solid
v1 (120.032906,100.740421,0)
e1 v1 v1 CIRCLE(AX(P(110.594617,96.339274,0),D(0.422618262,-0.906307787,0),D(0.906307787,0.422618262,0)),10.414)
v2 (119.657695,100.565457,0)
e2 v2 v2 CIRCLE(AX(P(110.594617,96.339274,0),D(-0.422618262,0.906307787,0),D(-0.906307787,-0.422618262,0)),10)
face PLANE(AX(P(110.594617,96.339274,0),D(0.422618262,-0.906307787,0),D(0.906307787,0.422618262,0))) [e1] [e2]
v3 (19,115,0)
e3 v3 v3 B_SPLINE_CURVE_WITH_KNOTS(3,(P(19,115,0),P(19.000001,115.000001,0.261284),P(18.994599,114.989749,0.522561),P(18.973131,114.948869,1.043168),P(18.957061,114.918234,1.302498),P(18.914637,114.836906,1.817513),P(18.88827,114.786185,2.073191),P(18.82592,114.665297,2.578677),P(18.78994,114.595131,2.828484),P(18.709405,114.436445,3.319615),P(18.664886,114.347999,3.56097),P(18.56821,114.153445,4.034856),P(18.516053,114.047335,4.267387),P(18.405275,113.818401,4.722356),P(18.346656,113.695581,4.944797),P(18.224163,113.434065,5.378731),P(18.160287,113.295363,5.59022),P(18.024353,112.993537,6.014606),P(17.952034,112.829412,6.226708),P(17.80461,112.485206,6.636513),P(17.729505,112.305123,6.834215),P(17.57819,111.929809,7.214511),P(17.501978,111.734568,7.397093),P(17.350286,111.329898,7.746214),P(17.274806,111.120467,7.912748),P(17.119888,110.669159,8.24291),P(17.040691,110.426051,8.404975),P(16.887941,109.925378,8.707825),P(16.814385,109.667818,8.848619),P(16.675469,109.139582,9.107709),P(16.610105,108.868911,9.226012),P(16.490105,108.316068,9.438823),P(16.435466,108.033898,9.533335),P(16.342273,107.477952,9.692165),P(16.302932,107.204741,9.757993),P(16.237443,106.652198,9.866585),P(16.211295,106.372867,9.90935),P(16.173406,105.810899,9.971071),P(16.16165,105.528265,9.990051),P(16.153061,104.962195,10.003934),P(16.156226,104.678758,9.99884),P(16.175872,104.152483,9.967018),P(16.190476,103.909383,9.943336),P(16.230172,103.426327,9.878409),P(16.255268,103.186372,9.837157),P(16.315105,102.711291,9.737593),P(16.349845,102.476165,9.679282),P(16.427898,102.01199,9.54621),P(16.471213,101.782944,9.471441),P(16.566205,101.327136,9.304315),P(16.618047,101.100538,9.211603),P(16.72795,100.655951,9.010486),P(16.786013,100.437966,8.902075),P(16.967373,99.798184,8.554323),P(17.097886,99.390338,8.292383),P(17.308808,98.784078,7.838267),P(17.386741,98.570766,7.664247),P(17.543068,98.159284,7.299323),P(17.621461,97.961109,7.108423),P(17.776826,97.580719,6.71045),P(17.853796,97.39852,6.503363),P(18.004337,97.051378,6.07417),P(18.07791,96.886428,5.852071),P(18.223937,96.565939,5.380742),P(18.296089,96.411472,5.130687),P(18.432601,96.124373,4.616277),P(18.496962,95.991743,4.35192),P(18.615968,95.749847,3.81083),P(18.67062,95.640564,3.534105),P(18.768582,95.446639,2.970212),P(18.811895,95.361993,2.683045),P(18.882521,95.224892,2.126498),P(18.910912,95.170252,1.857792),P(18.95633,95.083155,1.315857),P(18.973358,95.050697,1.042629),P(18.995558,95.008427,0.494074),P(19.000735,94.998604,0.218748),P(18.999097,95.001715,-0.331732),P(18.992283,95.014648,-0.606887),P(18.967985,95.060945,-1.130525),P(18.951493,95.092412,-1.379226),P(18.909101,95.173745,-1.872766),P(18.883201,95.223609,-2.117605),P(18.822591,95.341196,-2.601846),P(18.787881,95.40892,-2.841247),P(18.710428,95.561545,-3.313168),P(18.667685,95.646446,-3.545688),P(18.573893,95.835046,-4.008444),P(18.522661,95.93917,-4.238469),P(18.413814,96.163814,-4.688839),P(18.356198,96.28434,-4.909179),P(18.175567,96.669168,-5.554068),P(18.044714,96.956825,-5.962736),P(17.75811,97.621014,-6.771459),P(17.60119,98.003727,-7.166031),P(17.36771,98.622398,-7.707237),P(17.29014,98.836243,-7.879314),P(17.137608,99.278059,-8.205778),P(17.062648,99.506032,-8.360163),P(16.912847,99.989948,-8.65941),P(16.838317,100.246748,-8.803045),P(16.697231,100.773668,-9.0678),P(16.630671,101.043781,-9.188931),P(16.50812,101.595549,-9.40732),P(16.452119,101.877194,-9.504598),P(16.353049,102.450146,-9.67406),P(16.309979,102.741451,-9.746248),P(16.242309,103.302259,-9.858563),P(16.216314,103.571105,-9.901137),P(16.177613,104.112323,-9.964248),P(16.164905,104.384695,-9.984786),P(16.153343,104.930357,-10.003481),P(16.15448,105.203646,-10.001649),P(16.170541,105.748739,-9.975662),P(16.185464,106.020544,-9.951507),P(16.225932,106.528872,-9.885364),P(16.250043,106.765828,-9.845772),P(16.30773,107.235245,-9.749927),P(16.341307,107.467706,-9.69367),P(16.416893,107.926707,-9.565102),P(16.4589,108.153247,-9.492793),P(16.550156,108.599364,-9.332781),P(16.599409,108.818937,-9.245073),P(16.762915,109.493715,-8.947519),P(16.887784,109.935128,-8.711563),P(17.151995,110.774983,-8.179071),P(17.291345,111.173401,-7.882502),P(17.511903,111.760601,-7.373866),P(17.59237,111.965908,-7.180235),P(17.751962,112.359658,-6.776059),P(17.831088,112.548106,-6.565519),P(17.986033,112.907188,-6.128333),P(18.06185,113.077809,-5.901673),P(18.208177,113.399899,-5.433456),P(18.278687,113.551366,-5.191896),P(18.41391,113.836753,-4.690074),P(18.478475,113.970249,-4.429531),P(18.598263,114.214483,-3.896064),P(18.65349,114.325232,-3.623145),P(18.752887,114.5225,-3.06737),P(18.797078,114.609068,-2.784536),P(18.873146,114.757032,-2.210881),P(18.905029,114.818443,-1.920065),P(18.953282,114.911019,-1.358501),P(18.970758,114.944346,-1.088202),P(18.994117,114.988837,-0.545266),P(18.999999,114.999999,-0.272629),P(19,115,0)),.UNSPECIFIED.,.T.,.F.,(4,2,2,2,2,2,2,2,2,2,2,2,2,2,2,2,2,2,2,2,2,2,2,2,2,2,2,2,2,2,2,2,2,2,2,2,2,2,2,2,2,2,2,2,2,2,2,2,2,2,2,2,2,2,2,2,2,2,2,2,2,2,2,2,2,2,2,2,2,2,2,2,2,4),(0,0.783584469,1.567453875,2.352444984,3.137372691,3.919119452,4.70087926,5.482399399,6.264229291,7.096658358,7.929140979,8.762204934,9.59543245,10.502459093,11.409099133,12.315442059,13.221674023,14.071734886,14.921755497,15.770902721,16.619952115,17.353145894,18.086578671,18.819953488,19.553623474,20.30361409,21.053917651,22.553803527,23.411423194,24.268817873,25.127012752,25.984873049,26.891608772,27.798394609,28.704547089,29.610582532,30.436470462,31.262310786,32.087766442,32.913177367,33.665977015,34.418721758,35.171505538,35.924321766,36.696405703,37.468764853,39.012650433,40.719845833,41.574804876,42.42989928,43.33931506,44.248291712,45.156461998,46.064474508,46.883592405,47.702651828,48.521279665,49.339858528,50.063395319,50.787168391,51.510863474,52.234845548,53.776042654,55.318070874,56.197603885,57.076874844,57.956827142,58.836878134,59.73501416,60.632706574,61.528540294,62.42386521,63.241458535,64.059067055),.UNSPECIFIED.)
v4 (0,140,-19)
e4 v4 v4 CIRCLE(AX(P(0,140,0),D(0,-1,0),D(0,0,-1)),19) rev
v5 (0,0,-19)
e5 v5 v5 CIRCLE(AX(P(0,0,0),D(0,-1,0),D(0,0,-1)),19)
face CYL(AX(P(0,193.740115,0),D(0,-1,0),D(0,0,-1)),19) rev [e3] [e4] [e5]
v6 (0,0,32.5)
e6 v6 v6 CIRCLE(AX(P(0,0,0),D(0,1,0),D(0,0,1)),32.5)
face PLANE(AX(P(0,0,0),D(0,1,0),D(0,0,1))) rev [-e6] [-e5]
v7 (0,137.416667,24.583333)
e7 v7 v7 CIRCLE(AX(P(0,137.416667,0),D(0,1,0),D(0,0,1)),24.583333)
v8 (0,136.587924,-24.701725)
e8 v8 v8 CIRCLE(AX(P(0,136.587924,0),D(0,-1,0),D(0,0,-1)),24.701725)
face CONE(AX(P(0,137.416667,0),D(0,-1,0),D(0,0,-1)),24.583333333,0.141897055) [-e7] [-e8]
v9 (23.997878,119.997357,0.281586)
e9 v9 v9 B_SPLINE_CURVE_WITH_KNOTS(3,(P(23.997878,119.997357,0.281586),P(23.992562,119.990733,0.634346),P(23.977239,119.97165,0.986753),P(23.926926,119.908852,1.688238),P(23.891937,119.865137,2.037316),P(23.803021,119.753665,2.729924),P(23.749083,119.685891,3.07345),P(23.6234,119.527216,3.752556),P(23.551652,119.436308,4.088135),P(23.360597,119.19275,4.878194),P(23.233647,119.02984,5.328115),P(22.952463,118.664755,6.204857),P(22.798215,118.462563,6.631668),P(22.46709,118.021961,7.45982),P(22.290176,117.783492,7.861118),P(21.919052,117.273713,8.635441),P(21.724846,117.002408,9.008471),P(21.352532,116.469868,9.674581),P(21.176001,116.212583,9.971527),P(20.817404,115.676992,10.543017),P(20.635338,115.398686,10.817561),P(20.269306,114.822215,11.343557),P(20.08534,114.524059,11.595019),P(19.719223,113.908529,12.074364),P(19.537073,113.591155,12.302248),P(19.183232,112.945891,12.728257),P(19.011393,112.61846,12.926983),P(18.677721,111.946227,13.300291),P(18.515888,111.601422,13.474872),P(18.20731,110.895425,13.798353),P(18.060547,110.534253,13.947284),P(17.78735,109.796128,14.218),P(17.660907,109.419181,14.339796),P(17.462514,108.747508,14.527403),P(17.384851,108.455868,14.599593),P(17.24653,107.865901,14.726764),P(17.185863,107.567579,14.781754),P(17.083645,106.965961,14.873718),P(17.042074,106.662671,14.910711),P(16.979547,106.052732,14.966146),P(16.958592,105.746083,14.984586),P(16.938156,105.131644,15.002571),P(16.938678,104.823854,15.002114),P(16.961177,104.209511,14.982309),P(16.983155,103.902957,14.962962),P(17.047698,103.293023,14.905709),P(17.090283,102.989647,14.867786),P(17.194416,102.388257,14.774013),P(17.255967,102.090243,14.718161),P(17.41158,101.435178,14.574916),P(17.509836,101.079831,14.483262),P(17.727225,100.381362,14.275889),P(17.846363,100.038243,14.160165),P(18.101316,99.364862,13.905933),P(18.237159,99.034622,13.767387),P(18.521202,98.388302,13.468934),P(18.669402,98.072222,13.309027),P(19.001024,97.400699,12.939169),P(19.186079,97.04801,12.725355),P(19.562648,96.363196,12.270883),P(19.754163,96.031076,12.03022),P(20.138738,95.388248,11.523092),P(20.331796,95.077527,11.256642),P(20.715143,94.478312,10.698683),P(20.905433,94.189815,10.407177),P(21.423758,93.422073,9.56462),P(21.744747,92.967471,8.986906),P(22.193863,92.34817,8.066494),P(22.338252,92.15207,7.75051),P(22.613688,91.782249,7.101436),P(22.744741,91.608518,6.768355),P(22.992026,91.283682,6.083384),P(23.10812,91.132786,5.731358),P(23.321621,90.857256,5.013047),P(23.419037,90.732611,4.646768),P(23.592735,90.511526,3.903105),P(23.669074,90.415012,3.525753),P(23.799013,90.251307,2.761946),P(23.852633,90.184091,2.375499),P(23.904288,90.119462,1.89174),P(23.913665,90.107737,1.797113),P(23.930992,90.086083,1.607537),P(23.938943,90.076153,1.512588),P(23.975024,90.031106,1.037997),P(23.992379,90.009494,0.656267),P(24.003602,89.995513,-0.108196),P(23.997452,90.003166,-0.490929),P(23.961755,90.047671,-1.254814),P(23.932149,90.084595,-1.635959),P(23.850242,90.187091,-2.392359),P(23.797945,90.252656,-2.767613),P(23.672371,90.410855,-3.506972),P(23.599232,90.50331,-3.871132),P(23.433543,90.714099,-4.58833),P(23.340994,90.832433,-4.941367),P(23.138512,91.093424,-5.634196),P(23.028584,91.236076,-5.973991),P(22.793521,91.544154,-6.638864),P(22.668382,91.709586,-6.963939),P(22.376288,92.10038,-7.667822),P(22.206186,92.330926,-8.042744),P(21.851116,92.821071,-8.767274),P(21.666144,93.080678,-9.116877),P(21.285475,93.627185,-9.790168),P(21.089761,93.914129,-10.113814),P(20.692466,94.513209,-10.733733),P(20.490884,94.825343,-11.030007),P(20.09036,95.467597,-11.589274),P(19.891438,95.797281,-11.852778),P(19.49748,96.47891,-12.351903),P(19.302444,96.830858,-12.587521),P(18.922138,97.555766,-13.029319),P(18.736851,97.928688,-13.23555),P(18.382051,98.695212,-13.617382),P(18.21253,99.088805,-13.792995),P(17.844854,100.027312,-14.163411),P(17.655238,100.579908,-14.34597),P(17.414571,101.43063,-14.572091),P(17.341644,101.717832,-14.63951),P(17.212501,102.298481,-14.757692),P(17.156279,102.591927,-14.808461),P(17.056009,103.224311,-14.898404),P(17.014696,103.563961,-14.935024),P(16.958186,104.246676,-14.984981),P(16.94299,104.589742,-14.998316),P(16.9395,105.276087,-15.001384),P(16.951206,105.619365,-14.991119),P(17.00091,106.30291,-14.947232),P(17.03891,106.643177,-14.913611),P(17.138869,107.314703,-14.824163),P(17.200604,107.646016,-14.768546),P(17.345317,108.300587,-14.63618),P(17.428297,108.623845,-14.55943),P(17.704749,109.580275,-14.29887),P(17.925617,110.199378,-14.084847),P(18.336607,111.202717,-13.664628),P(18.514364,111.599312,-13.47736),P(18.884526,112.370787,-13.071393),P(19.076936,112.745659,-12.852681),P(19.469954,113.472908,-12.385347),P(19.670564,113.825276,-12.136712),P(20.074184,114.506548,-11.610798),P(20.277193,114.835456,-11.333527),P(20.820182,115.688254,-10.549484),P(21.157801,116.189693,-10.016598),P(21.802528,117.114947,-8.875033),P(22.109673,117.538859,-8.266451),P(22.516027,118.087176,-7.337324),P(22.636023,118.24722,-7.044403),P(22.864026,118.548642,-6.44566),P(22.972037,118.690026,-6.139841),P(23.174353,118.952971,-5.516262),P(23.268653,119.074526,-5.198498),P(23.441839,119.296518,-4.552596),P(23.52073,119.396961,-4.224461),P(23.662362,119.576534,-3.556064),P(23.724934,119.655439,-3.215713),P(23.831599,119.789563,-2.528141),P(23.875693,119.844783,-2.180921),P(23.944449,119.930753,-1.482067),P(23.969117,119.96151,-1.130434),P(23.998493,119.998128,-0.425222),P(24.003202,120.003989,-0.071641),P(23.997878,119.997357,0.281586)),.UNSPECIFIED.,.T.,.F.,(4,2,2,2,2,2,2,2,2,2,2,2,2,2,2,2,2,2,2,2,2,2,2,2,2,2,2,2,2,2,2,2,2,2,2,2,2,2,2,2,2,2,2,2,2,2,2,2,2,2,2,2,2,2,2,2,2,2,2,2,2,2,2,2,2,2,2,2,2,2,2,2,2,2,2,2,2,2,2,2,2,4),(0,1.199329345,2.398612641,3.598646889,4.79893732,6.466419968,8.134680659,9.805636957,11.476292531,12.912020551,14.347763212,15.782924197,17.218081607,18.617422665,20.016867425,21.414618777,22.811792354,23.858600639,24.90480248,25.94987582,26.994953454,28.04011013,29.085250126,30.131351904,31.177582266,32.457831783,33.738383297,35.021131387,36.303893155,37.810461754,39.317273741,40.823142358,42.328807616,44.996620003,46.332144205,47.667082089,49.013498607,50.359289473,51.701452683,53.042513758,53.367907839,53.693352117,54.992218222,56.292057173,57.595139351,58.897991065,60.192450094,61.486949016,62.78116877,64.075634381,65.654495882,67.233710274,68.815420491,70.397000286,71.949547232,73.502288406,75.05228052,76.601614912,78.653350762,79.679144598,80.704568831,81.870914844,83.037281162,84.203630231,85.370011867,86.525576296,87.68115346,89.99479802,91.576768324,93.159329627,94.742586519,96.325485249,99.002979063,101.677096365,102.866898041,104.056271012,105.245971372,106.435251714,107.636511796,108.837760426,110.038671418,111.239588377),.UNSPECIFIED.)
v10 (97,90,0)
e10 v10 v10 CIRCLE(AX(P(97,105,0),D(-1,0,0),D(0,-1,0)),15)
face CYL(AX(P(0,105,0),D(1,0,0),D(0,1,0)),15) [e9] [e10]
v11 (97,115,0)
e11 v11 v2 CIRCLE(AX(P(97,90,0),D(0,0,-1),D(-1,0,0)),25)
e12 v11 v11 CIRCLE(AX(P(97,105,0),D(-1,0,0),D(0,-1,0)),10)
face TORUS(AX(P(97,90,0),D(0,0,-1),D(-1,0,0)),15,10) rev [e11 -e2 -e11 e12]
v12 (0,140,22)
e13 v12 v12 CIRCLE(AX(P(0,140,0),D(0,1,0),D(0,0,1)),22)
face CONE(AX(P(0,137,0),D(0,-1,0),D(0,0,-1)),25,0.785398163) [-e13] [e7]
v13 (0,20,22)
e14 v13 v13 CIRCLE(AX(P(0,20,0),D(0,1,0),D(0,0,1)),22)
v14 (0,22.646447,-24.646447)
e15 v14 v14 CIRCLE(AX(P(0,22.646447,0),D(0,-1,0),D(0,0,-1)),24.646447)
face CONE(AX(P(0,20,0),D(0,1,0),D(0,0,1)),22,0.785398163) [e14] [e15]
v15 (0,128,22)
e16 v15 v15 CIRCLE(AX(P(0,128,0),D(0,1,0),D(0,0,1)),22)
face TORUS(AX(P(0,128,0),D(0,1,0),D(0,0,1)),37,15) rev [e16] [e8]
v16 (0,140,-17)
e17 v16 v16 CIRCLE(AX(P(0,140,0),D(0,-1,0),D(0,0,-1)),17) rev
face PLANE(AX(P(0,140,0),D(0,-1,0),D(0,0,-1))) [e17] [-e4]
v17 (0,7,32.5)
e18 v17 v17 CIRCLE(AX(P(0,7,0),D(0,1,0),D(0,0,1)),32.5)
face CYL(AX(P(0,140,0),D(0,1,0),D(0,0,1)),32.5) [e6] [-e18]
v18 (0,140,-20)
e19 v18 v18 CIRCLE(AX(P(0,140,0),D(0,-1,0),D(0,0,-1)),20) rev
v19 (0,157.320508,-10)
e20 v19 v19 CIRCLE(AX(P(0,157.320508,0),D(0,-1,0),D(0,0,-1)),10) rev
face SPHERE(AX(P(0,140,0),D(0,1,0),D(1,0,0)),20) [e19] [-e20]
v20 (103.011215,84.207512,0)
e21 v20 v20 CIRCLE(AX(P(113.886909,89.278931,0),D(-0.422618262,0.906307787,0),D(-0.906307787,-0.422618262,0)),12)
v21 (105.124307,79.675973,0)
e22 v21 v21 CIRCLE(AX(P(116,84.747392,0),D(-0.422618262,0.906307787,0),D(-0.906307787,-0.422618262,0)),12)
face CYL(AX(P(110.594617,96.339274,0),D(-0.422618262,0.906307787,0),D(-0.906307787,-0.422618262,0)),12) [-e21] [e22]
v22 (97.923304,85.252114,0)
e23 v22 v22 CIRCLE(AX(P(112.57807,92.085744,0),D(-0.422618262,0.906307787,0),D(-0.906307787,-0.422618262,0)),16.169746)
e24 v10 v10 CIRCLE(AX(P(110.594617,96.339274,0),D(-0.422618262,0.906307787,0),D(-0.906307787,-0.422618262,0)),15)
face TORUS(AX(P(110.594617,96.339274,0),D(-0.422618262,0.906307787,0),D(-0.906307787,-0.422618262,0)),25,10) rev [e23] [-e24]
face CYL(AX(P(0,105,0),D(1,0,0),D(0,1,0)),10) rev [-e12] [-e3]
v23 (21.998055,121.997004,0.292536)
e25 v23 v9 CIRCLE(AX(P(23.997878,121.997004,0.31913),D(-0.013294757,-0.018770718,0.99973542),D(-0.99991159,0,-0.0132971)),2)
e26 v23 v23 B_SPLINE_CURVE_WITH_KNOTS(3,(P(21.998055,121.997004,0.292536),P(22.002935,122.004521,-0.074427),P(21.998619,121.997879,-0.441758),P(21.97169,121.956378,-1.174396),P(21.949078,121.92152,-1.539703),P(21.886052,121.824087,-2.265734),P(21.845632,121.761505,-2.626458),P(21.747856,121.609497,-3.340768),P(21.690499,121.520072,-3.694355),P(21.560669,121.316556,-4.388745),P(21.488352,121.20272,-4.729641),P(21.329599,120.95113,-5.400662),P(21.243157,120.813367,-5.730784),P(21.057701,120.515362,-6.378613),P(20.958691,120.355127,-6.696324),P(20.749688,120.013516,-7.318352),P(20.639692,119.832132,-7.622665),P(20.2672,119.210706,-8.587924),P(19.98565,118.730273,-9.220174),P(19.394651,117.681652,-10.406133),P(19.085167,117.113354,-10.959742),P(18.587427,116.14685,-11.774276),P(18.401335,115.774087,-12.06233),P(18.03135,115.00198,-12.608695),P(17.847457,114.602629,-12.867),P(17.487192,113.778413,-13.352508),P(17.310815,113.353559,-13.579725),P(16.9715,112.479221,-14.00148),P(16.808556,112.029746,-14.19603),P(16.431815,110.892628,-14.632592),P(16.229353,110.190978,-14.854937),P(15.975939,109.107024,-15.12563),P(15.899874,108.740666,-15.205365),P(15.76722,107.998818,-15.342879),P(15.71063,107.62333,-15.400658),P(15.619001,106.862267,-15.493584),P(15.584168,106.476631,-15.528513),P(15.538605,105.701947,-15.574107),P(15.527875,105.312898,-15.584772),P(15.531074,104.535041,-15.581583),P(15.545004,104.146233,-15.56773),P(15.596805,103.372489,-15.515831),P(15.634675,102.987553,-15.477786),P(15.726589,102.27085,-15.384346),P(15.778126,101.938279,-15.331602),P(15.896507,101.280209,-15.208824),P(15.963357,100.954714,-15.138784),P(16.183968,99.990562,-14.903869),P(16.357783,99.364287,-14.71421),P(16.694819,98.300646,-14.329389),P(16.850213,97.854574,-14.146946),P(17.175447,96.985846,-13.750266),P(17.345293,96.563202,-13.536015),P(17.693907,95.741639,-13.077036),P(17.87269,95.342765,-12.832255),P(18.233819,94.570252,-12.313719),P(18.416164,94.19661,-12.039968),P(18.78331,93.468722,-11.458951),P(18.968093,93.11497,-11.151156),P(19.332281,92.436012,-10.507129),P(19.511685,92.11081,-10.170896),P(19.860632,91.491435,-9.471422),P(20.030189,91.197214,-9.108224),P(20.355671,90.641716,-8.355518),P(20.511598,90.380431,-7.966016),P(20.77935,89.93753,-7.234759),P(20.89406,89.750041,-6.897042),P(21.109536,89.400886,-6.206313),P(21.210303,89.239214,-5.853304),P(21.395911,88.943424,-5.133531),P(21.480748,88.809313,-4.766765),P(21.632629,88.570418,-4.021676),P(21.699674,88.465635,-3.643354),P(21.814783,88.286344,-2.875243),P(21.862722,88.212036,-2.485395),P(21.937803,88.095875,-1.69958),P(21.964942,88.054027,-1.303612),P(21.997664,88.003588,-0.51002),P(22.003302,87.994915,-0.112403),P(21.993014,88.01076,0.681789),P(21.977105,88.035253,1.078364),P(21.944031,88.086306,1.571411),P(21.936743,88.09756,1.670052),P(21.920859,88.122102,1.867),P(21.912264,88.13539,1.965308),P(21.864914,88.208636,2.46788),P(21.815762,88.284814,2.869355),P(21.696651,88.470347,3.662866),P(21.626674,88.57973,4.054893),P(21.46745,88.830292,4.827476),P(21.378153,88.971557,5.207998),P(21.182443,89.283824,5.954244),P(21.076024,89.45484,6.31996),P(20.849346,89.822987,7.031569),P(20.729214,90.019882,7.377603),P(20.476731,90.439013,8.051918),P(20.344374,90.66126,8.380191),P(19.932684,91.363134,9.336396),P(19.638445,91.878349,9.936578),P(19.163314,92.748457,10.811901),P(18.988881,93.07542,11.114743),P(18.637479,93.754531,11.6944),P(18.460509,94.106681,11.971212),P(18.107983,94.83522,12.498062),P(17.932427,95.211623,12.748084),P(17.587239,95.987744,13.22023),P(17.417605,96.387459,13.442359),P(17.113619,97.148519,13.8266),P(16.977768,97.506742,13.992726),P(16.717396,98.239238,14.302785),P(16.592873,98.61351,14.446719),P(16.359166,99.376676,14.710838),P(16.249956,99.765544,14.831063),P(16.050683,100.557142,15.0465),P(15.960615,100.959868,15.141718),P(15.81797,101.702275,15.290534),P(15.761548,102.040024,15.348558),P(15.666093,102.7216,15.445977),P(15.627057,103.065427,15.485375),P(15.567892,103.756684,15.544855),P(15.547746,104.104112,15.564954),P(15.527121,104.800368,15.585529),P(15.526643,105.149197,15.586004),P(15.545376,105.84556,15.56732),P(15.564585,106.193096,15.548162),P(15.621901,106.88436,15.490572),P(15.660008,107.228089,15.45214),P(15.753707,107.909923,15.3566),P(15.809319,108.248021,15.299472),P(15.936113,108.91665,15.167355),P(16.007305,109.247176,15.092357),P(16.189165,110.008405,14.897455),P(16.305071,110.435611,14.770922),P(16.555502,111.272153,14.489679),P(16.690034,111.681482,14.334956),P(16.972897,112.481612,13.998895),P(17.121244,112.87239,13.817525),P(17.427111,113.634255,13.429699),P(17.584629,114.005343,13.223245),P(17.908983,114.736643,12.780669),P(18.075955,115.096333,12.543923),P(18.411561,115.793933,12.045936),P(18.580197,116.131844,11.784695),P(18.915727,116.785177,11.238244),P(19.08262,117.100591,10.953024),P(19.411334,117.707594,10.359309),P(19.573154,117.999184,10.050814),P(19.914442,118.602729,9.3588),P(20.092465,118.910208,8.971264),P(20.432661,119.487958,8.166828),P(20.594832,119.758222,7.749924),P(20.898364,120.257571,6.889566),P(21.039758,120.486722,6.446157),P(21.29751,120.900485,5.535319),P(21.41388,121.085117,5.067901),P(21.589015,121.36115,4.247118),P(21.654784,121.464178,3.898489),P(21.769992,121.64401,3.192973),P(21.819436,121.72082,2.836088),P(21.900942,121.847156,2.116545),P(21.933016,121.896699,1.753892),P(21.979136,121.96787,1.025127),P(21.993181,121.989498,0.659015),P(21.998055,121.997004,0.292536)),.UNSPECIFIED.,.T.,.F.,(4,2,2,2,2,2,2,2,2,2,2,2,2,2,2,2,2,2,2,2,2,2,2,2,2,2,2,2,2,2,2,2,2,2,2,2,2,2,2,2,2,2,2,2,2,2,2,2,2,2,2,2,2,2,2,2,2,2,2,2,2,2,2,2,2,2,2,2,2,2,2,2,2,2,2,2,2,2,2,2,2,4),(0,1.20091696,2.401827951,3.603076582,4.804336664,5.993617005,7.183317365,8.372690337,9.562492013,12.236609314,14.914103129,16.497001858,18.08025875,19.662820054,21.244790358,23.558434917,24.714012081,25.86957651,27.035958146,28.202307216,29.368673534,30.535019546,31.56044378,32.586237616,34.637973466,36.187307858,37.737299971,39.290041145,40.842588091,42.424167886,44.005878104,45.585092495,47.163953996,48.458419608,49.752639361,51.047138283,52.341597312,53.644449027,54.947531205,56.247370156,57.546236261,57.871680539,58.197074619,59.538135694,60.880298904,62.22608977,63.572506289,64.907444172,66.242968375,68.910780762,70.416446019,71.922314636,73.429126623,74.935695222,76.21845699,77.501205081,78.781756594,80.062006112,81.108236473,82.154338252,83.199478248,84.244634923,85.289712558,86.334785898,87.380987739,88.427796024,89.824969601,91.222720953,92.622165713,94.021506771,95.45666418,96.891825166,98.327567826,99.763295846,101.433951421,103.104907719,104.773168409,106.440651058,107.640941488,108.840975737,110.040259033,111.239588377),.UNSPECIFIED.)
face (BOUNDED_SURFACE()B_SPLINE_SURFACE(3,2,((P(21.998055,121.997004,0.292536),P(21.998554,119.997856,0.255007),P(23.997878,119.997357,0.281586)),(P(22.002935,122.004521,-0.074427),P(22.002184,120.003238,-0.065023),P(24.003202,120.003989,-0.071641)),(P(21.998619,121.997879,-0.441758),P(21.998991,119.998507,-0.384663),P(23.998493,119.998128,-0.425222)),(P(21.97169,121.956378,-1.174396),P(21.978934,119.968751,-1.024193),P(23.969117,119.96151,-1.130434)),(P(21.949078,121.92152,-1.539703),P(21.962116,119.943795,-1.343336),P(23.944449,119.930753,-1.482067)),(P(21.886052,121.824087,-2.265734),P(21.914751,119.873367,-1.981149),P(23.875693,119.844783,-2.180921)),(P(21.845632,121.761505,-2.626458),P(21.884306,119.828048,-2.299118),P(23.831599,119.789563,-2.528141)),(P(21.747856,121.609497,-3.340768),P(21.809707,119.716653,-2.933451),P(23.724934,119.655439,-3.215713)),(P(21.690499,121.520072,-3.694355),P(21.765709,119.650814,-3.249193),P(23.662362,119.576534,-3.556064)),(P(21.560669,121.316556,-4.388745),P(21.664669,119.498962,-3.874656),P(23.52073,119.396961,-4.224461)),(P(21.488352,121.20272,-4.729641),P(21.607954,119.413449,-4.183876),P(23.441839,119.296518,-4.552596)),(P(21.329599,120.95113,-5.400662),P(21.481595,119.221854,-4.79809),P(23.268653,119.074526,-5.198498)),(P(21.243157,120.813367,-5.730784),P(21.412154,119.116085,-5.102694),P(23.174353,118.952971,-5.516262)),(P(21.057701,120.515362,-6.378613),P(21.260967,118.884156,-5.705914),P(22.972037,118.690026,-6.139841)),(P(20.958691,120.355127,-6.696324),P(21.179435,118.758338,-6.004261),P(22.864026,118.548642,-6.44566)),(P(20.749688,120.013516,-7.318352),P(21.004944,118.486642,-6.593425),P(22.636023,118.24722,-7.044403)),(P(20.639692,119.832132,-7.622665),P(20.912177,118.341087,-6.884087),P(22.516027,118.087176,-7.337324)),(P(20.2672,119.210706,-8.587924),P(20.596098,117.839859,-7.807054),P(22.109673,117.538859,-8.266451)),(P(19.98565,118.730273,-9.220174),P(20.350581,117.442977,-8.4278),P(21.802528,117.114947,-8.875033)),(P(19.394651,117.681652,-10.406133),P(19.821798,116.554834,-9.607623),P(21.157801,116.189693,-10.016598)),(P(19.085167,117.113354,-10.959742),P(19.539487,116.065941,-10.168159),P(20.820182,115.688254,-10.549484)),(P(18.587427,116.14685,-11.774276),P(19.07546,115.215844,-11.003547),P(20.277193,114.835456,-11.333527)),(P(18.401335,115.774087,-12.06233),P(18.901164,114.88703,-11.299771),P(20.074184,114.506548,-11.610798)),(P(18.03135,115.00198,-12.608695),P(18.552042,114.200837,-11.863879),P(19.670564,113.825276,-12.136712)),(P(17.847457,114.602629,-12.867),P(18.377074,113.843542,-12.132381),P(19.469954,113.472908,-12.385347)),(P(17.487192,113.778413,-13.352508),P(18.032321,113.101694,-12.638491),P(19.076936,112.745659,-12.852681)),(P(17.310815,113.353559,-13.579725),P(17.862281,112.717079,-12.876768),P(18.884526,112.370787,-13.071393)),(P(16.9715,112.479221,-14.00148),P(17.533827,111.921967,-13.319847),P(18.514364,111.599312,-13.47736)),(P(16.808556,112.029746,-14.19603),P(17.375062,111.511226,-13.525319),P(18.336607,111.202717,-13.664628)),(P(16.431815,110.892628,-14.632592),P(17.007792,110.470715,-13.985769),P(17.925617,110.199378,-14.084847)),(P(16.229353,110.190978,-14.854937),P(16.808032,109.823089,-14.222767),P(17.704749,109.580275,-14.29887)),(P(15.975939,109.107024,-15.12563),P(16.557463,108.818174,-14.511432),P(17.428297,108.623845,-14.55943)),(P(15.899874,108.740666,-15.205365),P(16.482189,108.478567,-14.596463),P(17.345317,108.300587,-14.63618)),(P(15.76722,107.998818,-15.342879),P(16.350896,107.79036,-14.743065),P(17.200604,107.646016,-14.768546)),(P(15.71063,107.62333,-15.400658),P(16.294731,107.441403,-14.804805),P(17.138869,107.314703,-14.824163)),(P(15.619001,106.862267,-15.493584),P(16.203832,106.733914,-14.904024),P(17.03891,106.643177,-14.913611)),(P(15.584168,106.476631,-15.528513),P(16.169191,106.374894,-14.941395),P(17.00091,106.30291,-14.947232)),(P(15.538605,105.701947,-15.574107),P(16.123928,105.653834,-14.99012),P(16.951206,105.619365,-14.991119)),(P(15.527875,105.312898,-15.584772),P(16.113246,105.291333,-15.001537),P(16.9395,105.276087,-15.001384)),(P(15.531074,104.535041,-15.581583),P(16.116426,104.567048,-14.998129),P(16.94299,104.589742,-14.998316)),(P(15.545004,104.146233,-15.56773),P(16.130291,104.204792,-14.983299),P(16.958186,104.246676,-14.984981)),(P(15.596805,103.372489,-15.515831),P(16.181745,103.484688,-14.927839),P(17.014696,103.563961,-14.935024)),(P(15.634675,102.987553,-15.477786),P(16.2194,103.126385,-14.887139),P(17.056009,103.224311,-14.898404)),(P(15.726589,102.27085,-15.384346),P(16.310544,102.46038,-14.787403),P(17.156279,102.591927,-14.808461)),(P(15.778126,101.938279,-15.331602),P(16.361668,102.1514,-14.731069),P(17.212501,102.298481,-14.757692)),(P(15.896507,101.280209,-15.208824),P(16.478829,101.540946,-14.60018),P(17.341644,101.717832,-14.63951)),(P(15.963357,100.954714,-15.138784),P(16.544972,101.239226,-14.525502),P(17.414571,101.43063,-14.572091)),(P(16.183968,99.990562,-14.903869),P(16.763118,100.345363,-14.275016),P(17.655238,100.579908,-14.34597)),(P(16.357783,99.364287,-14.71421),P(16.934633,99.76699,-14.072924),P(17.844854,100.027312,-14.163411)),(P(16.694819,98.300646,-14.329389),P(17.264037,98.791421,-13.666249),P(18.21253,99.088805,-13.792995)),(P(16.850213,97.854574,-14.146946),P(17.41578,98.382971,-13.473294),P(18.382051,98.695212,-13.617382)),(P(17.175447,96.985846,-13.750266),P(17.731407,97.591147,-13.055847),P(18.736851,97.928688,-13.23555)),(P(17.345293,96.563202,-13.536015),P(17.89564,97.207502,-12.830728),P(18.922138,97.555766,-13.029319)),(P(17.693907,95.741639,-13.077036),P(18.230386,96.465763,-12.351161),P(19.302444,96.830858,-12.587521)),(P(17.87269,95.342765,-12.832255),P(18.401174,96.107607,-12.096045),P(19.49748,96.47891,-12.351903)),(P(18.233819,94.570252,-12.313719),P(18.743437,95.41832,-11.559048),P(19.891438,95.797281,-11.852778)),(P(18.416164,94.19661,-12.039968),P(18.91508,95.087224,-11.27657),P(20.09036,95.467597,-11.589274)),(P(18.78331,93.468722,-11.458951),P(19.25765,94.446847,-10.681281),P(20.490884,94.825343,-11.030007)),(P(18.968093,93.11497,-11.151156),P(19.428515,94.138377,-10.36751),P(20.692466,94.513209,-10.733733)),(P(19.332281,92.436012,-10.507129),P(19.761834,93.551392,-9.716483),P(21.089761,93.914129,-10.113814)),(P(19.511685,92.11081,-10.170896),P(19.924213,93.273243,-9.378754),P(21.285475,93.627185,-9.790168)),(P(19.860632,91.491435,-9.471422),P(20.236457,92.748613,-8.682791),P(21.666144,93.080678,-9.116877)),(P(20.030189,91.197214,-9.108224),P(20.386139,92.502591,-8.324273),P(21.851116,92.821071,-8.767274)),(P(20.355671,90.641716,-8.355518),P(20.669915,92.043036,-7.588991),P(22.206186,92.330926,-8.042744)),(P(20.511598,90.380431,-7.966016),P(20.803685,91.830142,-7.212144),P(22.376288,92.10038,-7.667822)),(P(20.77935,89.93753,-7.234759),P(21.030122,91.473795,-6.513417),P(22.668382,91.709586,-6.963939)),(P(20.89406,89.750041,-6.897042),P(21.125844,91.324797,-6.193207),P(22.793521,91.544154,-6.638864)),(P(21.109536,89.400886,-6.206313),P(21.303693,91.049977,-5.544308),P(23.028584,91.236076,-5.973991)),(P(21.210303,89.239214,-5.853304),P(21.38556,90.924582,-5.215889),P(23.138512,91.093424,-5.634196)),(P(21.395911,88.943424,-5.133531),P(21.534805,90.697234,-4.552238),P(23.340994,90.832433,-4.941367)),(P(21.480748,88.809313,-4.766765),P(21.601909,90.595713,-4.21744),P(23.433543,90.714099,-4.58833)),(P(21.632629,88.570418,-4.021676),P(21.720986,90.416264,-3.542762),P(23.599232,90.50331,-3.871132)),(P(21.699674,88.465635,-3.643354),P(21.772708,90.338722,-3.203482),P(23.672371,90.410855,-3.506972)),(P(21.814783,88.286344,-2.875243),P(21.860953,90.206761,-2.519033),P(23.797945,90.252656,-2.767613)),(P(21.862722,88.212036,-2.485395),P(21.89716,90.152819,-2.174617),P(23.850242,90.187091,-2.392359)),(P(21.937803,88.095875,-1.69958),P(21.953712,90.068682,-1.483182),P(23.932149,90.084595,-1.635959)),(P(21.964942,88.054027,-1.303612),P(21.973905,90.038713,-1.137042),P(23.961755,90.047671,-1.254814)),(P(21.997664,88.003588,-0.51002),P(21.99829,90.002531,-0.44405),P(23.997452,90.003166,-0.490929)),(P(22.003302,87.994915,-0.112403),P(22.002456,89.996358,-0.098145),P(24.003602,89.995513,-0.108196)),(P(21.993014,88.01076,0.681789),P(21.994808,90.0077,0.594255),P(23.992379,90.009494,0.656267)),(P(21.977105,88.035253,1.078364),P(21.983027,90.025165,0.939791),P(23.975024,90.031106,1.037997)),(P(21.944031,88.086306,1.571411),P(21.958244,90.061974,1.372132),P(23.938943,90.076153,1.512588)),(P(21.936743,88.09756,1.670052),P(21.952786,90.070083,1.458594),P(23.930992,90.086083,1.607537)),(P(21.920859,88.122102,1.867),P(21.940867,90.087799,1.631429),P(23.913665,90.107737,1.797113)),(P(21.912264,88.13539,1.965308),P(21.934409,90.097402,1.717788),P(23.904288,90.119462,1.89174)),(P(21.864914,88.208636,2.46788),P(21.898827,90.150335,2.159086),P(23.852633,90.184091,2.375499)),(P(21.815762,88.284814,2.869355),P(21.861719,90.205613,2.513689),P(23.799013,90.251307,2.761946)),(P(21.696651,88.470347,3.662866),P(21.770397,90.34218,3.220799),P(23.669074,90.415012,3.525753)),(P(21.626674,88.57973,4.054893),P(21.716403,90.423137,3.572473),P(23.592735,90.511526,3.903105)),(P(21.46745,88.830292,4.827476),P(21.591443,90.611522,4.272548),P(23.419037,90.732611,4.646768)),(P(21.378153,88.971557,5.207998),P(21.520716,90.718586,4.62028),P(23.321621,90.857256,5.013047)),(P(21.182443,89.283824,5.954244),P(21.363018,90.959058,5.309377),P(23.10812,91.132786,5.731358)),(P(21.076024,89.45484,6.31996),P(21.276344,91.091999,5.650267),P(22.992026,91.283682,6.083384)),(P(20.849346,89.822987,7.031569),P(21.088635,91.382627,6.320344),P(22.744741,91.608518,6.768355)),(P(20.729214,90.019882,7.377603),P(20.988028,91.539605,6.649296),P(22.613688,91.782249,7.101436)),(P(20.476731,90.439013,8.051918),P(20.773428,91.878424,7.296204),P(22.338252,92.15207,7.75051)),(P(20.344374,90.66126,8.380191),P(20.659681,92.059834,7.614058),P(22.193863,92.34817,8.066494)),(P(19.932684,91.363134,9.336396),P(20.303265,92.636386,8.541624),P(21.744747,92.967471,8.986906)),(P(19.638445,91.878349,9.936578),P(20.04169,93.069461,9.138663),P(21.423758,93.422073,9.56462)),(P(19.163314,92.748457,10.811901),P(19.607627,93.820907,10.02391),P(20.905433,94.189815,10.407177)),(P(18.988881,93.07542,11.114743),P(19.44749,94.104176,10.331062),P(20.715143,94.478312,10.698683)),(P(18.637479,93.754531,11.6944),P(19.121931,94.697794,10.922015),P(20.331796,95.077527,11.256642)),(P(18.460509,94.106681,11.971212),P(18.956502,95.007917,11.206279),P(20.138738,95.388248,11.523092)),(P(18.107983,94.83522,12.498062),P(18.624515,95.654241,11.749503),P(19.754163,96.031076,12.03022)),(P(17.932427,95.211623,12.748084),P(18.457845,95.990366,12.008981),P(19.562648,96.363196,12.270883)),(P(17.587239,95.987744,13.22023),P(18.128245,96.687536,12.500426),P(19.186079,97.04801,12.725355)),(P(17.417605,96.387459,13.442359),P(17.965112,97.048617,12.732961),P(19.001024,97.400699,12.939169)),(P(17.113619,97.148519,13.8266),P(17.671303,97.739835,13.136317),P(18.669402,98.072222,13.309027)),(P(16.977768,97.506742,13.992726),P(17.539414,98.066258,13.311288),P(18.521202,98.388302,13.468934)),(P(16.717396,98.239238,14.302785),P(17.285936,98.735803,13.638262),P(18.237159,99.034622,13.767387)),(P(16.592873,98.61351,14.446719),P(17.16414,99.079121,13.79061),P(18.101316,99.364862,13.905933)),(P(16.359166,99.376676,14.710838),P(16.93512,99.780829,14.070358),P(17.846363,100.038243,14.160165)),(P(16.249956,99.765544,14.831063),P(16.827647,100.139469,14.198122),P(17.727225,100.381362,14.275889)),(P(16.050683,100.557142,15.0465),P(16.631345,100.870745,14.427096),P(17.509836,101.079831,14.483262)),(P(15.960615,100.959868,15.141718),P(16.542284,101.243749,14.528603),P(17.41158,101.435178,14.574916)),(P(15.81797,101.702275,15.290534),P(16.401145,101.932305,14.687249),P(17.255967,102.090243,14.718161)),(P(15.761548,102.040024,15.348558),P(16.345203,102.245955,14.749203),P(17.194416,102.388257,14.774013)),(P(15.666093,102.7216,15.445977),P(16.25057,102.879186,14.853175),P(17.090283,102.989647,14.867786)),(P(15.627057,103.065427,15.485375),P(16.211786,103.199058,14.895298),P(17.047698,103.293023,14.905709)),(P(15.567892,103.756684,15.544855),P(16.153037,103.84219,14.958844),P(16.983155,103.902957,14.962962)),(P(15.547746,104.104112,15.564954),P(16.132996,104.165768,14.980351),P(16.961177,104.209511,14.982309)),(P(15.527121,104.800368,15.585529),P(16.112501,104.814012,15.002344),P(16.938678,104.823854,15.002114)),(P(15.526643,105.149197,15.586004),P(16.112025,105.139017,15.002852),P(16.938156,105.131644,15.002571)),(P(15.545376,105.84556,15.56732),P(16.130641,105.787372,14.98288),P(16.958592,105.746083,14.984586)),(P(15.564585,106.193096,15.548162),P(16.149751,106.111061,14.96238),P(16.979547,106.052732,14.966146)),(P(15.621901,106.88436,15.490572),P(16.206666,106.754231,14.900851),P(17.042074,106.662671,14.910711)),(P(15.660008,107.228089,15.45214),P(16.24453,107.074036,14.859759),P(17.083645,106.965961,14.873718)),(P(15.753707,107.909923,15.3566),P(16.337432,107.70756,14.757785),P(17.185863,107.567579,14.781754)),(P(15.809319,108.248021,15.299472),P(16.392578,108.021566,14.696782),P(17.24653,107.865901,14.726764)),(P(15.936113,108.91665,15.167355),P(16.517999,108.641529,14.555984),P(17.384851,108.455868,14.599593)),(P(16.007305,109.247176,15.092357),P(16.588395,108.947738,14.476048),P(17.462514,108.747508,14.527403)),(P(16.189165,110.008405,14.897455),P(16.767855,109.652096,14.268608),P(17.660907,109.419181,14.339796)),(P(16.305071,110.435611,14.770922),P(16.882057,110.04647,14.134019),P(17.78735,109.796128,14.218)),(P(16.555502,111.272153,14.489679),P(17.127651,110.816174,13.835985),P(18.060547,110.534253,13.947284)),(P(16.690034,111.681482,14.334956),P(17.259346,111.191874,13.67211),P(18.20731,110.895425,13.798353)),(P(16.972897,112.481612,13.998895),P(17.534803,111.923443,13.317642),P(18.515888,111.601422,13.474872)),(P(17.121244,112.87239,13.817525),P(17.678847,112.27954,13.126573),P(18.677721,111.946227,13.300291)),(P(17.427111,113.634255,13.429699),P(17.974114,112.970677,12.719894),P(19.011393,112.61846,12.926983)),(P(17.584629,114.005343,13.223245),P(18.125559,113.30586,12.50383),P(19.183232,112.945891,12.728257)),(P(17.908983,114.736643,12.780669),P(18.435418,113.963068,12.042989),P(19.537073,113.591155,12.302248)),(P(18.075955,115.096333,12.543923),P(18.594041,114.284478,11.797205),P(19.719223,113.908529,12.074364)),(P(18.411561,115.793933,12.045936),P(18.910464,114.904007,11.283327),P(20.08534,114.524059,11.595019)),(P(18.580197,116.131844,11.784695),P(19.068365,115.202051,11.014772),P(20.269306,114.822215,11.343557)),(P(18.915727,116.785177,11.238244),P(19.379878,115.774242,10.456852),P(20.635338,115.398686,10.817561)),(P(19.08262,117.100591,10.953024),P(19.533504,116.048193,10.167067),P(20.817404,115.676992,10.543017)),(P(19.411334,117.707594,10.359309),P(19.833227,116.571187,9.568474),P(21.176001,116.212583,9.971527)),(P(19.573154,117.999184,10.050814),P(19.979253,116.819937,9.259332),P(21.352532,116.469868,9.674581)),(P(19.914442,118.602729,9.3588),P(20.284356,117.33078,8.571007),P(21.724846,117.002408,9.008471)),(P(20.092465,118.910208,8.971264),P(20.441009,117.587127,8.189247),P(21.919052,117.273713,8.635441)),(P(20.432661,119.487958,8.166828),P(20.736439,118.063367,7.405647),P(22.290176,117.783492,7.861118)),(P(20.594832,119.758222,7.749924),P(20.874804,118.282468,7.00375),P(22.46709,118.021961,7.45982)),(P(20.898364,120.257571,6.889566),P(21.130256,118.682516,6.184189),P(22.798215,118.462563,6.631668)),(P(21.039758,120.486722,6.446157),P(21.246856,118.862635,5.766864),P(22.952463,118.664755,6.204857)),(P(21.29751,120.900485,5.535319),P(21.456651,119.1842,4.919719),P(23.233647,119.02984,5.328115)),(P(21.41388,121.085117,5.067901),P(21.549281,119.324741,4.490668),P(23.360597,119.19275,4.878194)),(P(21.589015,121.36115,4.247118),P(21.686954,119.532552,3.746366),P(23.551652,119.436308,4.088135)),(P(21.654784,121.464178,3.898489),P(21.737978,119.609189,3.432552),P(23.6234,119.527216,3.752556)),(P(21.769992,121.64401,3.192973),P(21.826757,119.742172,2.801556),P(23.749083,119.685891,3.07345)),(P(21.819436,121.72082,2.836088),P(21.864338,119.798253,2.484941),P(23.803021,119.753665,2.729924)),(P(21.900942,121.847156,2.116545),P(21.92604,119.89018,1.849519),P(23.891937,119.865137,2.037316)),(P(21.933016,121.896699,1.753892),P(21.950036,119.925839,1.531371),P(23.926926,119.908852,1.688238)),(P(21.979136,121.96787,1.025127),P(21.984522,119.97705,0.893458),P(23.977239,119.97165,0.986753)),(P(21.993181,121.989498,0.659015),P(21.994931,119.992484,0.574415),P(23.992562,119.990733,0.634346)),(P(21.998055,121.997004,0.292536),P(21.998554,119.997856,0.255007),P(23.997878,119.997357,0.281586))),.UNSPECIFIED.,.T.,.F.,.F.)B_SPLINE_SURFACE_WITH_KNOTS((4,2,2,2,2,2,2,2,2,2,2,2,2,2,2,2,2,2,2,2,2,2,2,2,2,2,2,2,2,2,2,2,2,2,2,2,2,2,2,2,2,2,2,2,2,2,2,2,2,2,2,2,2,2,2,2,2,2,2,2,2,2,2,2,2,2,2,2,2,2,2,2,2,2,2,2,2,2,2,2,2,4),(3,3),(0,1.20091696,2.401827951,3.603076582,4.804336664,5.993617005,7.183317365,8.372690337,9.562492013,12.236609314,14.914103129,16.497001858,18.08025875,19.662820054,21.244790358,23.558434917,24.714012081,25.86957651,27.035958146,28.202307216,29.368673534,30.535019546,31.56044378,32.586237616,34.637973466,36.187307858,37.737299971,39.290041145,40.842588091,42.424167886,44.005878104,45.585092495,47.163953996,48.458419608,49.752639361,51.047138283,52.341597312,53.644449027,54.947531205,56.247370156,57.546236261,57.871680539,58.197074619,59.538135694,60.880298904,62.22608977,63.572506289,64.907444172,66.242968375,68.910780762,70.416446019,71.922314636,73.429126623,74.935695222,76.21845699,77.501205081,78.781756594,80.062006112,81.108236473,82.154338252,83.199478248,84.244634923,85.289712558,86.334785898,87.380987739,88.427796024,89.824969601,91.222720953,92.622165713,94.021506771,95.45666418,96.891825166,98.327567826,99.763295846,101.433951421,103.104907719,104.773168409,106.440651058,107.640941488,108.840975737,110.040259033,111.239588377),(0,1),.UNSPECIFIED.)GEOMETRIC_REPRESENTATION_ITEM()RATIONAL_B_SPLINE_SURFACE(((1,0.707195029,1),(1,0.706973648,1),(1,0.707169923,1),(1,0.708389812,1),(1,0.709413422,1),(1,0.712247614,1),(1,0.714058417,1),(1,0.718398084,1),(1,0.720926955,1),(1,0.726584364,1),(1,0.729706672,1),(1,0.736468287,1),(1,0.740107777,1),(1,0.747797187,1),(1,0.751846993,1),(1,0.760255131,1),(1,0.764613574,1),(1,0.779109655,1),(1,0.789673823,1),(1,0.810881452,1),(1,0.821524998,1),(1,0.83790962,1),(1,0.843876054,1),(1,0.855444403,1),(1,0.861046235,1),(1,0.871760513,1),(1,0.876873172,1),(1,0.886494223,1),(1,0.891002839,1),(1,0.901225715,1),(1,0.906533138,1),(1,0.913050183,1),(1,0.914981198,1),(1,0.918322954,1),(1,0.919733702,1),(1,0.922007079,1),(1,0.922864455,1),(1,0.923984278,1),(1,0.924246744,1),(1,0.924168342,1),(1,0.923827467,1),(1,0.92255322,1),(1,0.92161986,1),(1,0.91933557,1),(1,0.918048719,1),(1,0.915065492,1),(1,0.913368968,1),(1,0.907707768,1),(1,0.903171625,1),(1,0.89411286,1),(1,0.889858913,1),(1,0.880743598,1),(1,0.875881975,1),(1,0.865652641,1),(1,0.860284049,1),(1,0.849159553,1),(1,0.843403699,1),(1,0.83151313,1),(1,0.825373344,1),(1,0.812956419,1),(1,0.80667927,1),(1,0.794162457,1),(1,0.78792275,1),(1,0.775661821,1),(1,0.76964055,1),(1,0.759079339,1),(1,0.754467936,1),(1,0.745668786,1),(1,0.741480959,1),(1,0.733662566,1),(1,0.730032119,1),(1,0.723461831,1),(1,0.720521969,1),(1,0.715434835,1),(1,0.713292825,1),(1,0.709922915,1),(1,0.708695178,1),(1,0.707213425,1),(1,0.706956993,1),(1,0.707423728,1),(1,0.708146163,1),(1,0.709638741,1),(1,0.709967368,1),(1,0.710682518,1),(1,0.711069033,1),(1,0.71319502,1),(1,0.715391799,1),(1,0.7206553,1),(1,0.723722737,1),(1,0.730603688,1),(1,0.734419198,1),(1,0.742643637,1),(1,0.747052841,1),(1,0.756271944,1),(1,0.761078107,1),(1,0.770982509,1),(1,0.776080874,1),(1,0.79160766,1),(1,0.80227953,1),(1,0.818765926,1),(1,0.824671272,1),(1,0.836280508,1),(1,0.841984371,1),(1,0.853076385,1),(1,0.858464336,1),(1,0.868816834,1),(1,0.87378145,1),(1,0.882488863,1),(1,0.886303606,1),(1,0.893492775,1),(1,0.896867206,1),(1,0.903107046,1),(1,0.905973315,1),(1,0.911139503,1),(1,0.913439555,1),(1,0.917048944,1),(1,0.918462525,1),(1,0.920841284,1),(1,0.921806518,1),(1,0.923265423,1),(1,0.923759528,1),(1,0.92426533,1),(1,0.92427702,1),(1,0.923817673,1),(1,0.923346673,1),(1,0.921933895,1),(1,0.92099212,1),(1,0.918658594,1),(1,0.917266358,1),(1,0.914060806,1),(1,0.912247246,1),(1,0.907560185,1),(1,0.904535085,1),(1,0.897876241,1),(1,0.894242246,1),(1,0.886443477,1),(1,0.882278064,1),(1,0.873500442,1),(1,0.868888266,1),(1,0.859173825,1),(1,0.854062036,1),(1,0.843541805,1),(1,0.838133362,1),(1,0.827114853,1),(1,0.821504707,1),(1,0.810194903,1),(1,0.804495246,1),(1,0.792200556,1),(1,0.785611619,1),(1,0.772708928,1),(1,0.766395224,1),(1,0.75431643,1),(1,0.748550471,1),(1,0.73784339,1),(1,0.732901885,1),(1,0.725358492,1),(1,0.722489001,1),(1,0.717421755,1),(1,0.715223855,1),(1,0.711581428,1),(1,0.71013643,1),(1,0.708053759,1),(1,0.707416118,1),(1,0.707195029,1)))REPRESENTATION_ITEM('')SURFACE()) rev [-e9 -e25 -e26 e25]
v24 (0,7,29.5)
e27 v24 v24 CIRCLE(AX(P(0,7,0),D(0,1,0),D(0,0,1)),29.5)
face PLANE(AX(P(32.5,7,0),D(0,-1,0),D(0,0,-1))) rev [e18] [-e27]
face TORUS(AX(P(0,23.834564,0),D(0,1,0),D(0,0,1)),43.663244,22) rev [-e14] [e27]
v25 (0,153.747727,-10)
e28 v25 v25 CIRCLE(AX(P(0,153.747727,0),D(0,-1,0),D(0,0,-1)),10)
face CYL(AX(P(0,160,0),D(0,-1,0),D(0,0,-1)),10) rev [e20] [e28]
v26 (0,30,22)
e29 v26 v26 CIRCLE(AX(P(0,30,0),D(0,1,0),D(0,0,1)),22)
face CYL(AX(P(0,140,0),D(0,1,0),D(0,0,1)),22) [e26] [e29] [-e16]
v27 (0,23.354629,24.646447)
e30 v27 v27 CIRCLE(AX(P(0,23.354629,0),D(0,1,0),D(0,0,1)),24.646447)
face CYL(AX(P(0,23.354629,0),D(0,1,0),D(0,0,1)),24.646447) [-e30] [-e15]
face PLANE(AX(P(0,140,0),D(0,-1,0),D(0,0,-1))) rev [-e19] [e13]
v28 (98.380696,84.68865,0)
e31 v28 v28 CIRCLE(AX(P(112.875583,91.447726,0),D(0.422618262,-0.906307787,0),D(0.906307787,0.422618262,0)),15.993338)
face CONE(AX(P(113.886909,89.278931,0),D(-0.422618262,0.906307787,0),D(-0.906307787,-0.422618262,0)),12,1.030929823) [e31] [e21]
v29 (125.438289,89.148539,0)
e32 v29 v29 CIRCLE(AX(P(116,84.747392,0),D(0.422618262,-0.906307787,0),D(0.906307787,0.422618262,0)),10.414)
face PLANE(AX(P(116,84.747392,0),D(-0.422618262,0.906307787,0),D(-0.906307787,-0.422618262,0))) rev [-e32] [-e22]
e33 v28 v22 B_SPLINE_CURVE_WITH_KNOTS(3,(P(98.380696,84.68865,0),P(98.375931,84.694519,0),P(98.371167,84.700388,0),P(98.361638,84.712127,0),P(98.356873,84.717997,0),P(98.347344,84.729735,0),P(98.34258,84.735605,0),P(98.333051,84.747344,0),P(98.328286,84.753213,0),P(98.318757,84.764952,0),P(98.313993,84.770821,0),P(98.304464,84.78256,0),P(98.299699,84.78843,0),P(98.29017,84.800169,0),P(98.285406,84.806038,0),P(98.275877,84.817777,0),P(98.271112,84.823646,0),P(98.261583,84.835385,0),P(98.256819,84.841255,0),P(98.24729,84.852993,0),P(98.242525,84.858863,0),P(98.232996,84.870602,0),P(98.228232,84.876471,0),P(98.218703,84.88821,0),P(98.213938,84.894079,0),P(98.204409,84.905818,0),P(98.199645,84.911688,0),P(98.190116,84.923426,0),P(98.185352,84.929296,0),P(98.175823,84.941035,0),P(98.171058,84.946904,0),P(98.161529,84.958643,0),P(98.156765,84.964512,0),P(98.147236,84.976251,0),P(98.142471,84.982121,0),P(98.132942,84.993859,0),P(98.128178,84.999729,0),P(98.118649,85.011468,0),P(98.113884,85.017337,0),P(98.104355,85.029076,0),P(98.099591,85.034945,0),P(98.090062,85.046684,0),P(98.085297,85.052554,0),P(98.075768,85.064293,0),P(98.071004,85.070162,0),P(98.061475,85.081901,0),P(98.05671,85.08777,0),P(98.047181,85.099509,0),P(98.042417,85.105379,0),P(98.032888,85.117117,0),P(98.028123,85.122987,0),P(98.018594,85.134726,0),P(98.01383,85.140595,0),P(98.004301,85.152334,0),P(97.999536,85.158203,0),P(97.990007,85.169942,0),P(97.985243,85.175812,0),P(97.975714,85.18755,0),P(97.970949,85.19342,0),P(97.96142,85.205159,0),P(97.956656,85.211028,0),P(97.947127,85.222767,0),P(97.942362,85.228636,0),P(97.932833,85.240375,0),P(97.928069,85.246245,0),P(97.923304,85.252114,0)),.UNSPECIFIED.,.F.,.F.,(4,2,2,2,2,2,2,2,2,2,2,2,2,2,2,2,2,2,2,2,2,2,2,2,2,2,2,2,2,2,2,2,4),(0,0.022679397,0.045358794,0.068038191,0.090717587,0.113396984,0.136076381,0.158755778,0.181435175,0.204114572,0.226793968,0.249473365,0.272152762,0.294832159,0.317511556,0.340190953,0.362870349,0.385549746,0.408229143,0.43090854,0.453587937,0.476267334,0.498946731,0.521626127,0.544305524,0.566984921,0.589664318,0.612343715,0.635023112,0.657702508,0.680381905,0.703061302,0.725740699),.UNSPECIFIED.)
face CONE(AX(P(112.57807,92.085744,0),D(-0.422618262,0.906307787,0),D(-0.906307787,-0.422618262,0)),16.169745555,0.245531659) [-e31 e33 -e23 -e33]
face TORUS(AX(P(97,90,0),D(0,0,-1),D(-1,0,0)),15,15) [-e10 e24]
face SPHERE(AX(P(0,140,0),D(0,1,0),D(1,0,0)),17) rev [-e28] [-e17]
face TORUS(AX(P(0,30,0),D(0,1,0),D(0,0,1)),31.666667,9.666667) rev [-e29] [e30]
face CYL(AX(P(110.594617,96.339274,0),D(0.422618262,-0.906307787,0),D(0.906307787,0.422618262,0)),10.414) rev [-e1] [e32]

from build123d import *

# Parameters (mm, degrees)
SWEEP1_PROFILE_R     = 15
CHAMFER1_SIZE        = 0.5
CHAMFER1_SIZE_2      = 0.589255651
CUT_SWEEP1_PROFILE_R = 10
SKETCH39_R           = 10.414
CUT_EXTRUDE1_DEPTH   = 12.790226
FILLET1_R            = 2
CUT_EXTRUDE3_REACH   = 209.074
SKETCH66_R           = 19
SKETCH67_R           = 10
CUT_EXTRUDE4_DEPTH   = 193.040325543


with BuildPart() as part:
    # Sketch1 → Revolve1 (revolve)
    with BuildSketch(Plane.XY, mode=Mode.PRIVATE) as revolve1_sk:
        with BuildLine():
            Line((0, 0), (32.5, 0))
            Line((32.5, 0), (32.5, 7))
            Line((32.5, 7), (29.5, 7))
            ThreePointArc((29.5, 7), (24.607160678, 12.840669622), (22, 20))
            Line((22, 20), (25, 23))
            ThreePointArc((25, 23), (22.781598043, 26.192113447), (22, 30))
            Line((22, 30), (22, 128))
            ThreePointArc((22, 128), (22.769750529, 132.74341649), (25, 137))
            Line((25, 137), (22, 140))
            Line((22, 140), (0, 140))
            Line((0, 140), (0, 0))
        make_face()
    revolve(revolve1_sk.sketch.rotate(Axis((0, 140, 0), (0, -1, 0)), 90), axis=Axis((0, 140, 0), (0, -1, 0)))

    # Sweep1: sweep along a path in Sketch3
    with BuildLine(Plane.XY) as sweep1_path:
        Line((0, 105), (97, 105))
        ThreePointArc((97, 105), (105.059494125, 102.650871687), (110.594616806, 96.339273926))
    # Sweep1 profile (on start of the path) → Sweep1 (sweep)
    with BuildSketch(Plane(origin=(0, 105, 0), x_dir=(0, 1, 0), z_dir=(1, 0, 0))):
        Circle(SWEEP1_PROFILE_R)
    sweep(path=sweep1_path.line)

    # Sketch16 → Revolve3 (revolve)
    with BuildSketch(Plane.XY, mode=Mode.PRIVATE) as revolve3_sk:
        with BuildLine():
            Line((116, 84.747392258), (126.875693444, 89.818811398))
            Line((126.875693444, 89.818811398), (124.762602136, 94.350350334))
            Line((124.762602136, 94.350350334), (127.650557609, 98.620990158))
            ThreePointArc((127.650557609, 98.620990158), (125.644403351, 100.414758676), (124.189233611, 102.678547852))
            Line((124.189233611, 102.678547852), (110.594616806, 96.339273926))
            Line((110.594616806, 96.339273926), (116, 84.747392258))
        make_face()
    revolve(revolve3_sk.sketch.rotate(Axis((110.594616806, 96.339273926, 0), (0.4226182617406933, -0.9063077870366529, 0)), 180), axis=Axis((110.594616806, 96.339273926, 0), (0.4226182617406933, -0.9063077870366529, 0)))

    # Chamfer1
    # the kernel refuses this chamfer: 0.589255651, 0.5, 0.488240397 mm, written as the material it takes off along each edge
    with BuildSketch(Plane(origin=(0, 23, 0), x_dir=(0, 0, 1), z_dir=(1, 0, 0))) as chamfer1_piece_1:
        with BuildLine():
            Line((25 - CHAMFER1_SIZE * 0.707106781187, CHAMFER1_SIZE * 0.707106781187), (24.646446609, -0.35462907))
            ThreePointArc((24.646446609, -0.35462907), (24.815923099, -0.18004714), (25, 0))
            Line((25, 0), (25 - CHAMFER1_SIZE * 0.707106781187, CHAMFER1_SIZE * 0.707106781187))
        make_face()
    revolve(axis=Axis((0, 23, 0), (0, -1, 0)), mode=Mode.SUBTRACT)
    with BuildSketch(Plane(origin=(112.766965477, 91.680657166, 0), x_dir=(-0.9063077870366528, -0.42261826174069334, 0), z_dir=(0, 0, 1))) as chamfer1_piece_2:
        with BuildLine():
            Line((16.169745555, -0.446963708), (16.422226913 - CHAMFER1_SIZE * 0.857777308691, CHAMFER1_SIZE * 0.514021486608))
            Line((16.422226913 - CHAMFER1_SIZE * 0.857777308691, CHAMFER1_SIZE * 0.514021486608), (16.422226913, 0))
            ThreePointArc((16.422226913, 0), (16.289550416, -0.228181881), (16.169745555, -0.446963708))
        make_face()
    revolve(axis=Axis((112.766965477, 91.680657166, 0), (0.4226182617406933, -0.9063077870366529, 0)), mode=Mode.SUBTRACT)
    with BuildSketch(Plane(origin=(0, 137, 0), x_dir=(0, 0, 1), z_dir=(1, 0, 0))) as chamfer1_piece_3:
        with BuildLine():
            Line((24.701725164, 0.412076149), (25 - CHAMFER1_SIZE_2 * 0.707106781173, -CHAMFER1_SIZE_2 * 0.707106781173))
            Line((25 - CHAMFER1_SIZE_2 * 0.707106781173, -CHAMFER1_SIZE_2 * 0.707106781173), (25, 0))
            ThreePointArc((25, 0), (24.844145725, 0.211643678), (24.701725164, 0.412076149))
        make_face()
    revolve(axis=Axis((0, 137, 0), (0, -1, 0)), mode=Mode.SUBTRACT)

    # Cut-Sweep1: sweep along a path in Sketch3<3>
    with BuildLine(Plane.XY) as cut_sweep1_path:
        Line((0, 105), (97, 105))
        ThreePointArc((97, 105), (105.059494125, 102.650871687), (110.594616806, 96.339273926))
    # Cut-Sweep1 profile (on start of the path) → Cut-Sweep1 (sweep, cut)
    with BuildSketch(Plane(origin=(0, 105, 0), x_dir=(0, 1, 0), z_dir=(1, 0, 0))):
        Circle(CUT_SWEEP1_PROFILE_R)
    sweep(path=cut_sweep1_path.line, mode=Mode.SUBTRACT)

    # Sketch39 → Cut-Extrude1 (cut)
    with BuildSketch(Plane(origin=(-11.741815816, 25.180405276, 0), x_dir=(-0.9063077870366528, -0.4226182617406934, 0), z_dir=(0.42261826174069334, -0.9063077870366527, 0))):
        with Locations(Location((-140.947498899, 0, 0), (0, 0, 180))):
            Circle(SKETCH39_R)
    extrude(amount=-CUT_EXTRUDE1_DEPTH, mode=Mode.SUBTRACT)

    # Fillet1
    fillet1_edges = [part.edges().sort_by_distance(p)[0] for p in [
        (22, 90, 0),
    ]]
    fillet(fillet1_edges, radius=FILLET1_R)

    # Sketch65 → Revolve4 (revolve)
    with BuildSketch(Plane.XY):
        with BuildLine():
            Line((20, 140), (17, 140))
            ThreePointArc((17, 140), (12.02081528, 152.02081528), (0, 157))
            Line((0, 157), (0, 160))
            ThreePointArc((0, 160), (14.142135624, 154.142135624), (20, 140))
        make_face()
    revolve(axis=Axis((0, 160, 0), (0, -1, 0)))

    # Cut-Extrude3: up to this face of the body (flat: up to its plane)
    cut_extrude3_end = Plane(part.part.faces().sort_by_distance((0, 140, -21.377746033))[0])
    # Sketch66 → Cut-Extrude3 (cut, up to the picked face)
    with BuildSketch(Plane.XZ, mode=Mode.PRIVATE) as cut_extrude3_sk1:
        with Locations(Location((0, 0, 0), (0, 0, 270))):
            Circle(SKETCH66_R)
    cut_extrude3_tool1 = split(extrude(cut_extrude3_sk1.sketch, amount=-CUT_EXTRUDE3_REACH, mode=Mode.PRIVATE), bisect_by=cut_extrude3_end, keep=Keep.BOTH, mode=Mode.PRIVATE)
    add(cut_extrude3_tool1.solids().sort_by(Axis((0, 0, 0), (0, 1, 0)))[0], mode=Mode.SUBTRACT)

    # Sketch67 → Cut-Extrude4 (cut, through all)
    with BuildSketch(Plane(origin=(0, 140, 0), x_dir=(1, 0, 0), z_dir=(0, 1, 0))):
        with Locations(Location((0, 0, 0), (0, 0, 90))):
            Circle(SKETCH67_R)
    extrude(amount=CUT_EXTRUDE4_DEPTH, mode=Mode.SUBTRACT)


solid = part.part
